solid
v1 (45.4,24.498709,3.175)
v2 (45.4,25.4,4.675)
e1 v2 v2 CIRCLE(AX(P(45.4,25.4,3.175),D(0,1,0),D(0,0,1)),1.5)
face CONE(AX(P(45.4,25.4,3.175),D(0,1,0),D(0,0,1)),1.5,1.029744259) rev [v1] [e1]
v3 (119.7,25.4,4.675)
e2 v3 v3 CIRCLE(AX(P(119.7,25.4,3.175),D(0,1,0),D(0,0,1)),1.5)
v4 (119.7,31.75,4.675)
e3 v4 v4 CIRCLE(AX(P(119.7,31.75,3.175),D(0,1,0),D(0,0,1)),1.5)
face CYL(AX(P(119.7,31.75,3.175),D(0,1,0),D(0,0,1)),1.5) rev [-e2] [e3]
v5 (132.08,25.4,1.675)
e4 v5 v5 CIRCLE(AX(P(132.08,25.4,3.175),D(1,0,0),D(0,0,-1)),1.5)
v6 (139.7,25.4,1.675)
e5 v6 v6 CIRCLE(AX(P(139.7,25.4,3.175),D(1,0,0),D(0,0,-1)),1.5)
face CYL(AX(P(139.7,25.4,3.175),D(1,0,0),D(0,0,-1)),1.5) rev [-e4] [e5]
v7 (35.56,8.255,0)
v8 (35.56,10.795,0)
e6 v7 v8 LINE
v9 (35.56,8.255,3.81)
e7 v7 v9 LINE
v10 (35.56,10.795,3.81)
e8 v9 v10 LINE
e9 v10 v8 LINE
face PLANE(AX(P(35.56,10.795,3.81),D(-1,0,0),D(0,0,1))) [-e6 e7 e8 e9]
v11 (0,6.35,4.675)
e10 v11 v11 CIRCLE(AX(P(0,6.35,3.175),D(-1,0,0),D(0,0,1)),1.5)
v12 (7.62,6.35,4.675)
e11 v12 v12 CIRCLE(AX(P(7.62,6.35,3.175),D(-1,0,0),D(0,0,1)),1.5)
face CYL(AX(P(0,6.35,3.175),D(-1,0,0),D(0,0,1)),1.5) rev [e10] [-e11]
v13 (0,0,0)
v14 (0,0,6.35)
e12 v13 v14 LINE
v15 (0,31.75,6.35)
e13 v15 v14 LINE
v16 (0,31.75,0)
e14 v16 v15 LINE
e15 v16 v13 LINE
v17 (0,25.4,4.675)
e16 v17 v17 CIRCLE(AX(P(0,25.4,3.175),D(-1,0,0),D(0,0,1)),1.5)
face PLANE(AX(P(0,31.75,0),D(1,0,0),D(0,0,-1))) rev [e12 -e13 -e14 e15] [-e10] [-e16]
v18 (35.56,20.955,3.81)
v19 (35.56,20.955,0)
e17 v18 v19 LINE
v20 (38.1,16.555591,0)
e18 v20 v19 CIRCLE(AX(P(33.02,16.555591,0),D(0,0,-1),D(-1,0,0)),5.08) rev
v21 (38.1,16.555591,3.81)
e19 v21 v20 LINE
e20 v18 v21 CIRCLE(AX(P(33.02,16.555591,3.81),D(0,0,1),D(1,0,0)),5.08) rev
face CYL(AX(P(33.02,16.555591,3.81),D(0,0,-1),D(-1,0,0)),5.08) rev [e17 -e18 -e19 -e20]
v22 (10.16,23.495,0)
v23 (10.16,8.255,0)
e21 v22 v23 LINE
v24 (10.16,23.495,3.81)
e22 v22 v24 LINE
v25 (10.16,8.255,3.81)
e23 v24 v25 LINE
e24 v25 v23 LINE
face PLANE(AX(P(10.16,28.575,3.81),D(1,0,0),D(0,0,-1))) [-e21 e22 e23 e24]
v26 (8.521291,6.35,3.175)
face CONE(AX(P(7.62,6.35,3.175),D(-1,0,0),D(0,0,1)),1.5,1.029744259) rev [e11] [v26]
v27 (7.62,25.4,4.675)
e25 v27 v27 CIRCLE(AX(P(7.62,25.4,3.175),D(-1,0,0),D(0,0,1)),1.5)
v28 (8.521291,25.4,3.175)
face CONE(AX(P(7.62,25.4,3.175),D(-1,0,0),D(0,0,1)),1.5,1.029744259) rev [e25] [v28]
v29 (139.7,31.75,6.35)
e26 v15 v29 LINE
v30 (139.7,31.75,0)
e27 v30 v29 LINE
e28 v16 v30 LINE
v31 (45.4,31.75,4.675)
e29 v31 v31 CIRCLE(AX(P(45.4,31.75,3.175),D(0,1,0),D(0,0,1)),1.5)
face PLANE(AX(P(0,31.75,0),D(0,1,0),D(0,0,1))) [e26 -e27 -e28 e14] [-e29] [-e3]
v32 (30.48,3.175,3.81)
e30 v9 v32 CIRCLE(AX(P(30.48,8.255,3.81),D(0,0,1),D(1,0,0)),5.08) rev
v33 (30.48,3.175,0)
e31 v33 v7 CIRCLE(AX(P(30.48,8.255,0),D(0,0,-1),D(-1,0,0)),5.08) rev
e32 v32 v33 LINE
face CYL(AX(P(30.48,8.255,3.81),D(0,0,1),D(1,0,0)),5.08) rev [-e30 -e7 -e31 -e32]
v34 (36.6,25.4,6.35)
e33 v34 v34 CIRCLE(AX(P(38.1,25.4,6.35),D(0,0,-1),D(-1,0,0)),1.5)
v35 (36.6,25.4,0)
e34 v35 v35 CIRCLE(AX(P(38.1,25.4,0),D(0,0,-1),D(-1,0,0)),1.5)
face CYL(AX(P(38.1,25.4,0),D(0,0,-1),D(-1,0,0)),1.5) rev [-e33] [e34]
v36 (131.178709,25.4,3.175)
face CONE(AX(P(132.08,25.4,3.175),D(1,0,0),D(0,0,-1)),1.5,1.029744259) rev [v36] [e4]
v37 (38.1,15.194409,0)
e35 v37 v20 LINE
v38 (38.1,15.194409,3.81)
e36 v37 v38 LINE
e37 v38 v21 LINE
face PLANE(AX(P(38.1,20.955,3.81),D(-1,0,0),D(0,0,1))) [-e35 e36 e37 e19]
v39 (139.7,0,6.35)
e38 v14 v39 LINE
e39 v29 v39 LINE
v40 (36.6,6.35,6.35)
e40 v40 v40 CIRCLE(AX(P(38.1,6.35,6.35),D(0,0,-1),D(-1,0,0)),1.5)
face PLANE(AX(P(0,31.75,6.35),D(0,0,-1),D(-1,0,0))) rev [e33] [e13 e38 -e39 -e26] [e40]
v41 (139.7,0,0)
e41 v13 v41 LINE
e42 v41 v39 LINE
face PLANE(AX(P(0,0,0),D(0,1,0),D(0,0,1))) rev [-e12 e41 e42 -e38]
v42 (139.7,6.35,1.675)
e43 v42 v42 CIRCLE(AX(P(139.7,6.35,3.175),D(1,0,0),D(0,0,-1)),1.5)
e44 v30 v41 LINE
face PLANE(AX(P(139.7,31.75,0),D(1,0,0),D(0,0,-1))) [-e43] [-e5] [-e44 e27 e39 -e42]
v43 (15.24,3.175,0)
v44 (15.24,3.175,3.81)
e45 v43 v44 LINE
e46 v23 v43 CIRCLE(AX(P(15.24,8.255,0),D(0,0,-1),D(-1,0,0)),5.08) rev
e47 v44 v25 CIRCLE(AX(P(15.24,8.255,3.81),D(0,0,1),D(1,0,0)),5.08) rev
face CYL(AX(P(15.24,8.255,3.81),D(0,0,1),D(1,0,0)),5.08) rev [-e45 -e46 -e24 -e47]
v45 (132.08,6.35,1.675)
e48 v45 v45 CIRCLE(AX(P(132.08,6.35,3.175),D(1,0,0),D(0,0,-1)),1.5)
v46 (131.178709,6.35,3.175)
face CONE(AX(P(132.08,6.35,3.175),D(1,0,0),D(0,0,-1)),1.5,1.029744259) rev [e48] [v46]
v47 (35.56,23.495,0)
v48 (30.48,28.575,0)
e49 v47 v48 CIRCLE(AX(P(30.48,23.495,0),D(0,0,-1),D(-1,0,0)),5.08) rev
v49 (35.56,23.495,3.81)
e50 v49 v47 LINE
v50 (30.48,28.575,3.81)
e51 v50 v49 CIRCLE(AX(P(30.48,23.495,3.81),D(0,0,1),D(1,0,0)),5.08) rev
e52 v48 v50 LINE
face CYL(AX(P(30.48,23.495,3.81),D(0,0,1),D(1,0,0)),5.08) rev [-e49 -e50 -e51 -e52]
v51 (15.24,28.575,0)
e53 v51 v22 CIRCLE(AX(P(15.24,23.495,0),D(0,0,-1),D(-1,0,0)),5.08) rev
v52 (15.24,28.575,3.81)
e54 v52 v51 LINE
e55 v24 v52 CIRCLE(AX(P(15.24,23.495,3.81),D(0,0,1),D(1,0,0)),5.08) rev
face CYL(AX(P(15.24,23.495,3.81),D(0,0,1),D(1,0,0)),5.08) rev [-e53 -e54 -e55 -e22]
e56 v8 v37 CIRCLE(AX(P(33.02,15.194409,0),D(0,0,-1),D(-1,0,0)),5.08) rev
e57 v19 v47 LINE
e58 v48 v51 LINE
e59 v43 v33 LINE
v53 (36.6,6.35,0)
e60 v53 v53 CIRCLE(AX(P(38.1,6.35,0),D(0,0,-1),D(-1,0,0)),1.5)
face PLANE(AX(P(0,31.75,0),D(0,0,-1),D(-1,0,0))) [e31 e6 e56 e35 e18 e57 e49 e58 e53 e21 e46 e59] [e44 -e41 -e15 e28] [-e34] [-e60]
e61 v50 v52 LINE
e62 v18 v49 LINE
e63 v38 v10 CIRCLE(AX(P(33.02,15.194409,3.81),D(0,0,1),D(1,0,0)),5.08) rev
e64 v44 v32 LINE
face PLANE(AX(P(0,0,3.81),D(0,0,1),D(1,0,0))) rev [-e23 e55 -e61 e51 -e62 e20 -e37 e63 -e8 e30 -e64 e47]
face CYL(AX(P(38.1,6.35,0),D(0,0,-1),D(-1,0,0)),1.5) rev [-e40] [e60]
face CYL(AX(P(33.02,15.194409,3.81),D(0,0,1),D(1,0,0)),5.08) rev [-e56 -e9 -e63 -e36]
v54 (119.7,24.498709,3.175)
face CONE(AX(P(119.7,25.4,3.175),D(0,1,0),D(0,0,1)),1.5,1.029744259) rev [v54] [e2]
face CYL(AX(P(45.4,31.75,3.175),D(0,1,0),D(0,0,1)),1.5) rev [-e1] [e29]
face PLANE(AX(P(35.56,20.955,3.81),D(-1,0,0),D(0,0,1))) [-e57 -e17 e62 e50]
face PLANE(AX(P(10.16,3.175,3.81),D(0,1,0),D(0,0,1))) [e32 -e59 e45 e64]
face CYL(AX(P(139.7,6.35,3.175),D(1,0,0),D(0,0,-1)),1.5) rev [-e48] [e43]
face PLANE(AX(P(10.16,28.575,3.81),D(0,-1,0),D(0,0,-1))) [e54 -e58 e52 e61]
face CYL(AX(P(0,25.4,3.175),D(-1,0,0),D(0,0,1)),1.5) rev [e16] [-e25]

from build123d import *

# Parameters (mm, degrees)
TOP_PROFILE_W                  = 139.7
TOP_PROFILE_H                  = 6.35
WALL_MID_DEPTH                 = 31.75
F_3_0MM_DOWEL_HOLE1_D          = 3
MOTOR_INTERFERECNE_DEPTH       = 3.81
FILLET2_R                      = 5.08
F_3_0MM_DOWEL_HOLE2_AT_2_COUNT = 2
F_3_0MM_DOWEL_HOLE2_AT_2_PITCH = 19.05
F_3_0MM_DOWEL_HOLE4_D          = 3
F_3_0MM_DOWEL_HOLE4_DEPTH      = 6.35
F_3_0MM_DOWEL_HOLE4_TIP        = 0.901290929


with BuildPart() as part:
    # top profile → wall mid (new body)
    with BuildSketch(Plane(origin=(0, 0, 0), x_dir=(1, 0, 0), z_dir=(0, 1, 0))):
        with Locations((69.85, -3.175)):
            Rectangle(TOP_PROFILE_W, TOP_PROFILE_H)
    extrude(amount=WALL_MID_DEPTH)

    # Ø3.0mm Dowel Hole1 (through all)
    with Locations(Plane(origin=(0, 0, 0), x_dir=(1, 0, 0), z_dir=(0, 0, -1))):
        with Locations((38.1, -6.35), (38.1, -25.4)):
            Hole(F_3_0MM_DOWEL_HOLE1_D / 2)

    # Sketch8 → motor interferecne (cut)
    with BuildSketch(Plane.XY):
        Polygon((10.16, 28.575), (35.56, 28.575), (35.56, 20.955), (38.1, 20.955), (38.1, 10.795), (35.56, 10.795), (35.56, 3.175), (10.16, 3.175), align=None)
    extrude(amount=MOTOR_INTERFERECNE_DEPTH, mode=Mode.SUBTRACT)

    # Fillet2
    # the kernel refuses this fillet: 5.08 mm, written as the material it adds along each edge
    with BuildSketch(Plane(origin=(10.16, 3.175, 0), x_dir=(1, 0, 0), z_dir=(0, 0, 1)), Plane(origin=(35.56, 3.175, 0), x_dir=(0, 1, 0), z_dir=(0, 0, 1)), Plane(origin=(35.56, 28.575, 0), x_dir=(-1, 0, 0), z_dir=(0, 0, 1))) as fillet2_piece_1:
        with BuildLine():
            CenterArc((FILLET2_R, FILLET2_R), FILLET2_R, 180, 90)
            Line((0, FILLET2_R), (-FILLET2_R * 0.02, FILLET2_R))
            Line((-FILLET2_R * 0.02, FILLET2_R), (-FILLET2_R * 0.02, -FILLET2_R * 0.02))
            Line((-FILLET2_R * 0.02, -FILLET2_R * 0.02), (FILLET2_R, -FILLET2_R * 0.02))
            Line((FILLET2_R, -FILLET2_R * 0.02), (FILLET2_R, 0))
        make_face()
    extrude(amount=3.81)
    with BuildSketch(Plane(origin=(10.16, 28.575, 0), x_dir=(1, 0, 0), z_dir=(0, 0, 1))) as fillet2_piece_2:
        with BuildLine():
            CenterArc((FILLET2_R, -FILLET2_R), FILLET2_R, 90, 90)
            Line((0, -FILLET2_R), (-FILLET2_R * 0.02, -FILLET2_R))
            Line((-FILLET2_R * 0.02, -FILLET2_R), (-FILLET2_R * 0.02, FILLET2_R * 0.02))
            Line((-FILLET2_R * 0.02, FILLET2_R * 0.02), (FILLET2_R, FILLET2_R * 0.02))
            Line((FILLET2_R, FILLET2_R * 0.02), (FILLET2_R, 0))
        make_face()
    extrude(amount=3.81)
    with BuildSketch(Plane(origin=(38.1, 10.795, 0), x_dir=(0, 1, 0), z_dir=(0, 0, 1))) as fillet2_piece_3:
        with BuildLine():
            CenterArc((4.399409051, 5.08), FILLET2_R, 210, 60)
            Line((0, 2.54), (-0.087988181, 2.4892))
            ThreePointArc((-0.087988181, 2.4892), (-0.1016, 1.27), (-0.1016, 0))
            Line((-0.1016, 0), (0, -0.1016))
            Line((0, -0.1016), (4.399409051, -0.1016))
            Line((4.399409051, -0.1016), (4.399409051, 0))
        make_face()
    extrude(amount=3.81)
    with BuildSketch(Plane(origin=(38.1, 20.955, 0), x_dir=(-1, 0, 0), z_dir=(0, 0, 1))) as fillet2_piece_4:
        with BuildLine():
            CenterArc((5.08, 4.399409051), FILLET2_R, 180, 60)
            Line((0, 4.399409051), (-0.1016, 4.399409051))
            Line((-0.1016, 4.399409051), (-0.1016, 0))
            Line((-0.1016, 0), (0, -0.1016))
            ThreePointArc((0, -0.1016), (1.27, -0.1016), (2.4892, -0.087988181))
            Line((2.4892, -0.087988181), (2.54, 0))
        make_face()
    extrude(amount=3.81)

    # Sketch13 → Ø3.0mm Dowel Hole2 (revolve, cut)
    with BuildSketch(Plane(origin=(0, 25.4, 3.175), x_dir=(0, 0, 1), z_dir=(0, 1, 0))):
        Polygon((0, 0), (0, 8.521290929), (1.5, 7.62), (1.5, 0), align=None)
    f_3_0mm_dowel_hole2 = revolve(axis=Axis((-6.35, 25.4, 3.175), (1, 0, 0)), mode=Mode.SUBTRACT)

    # Ø3.0mm Dowel Hole2 at 2: Ø3.0mm Dowel Hole2 ×2
    with Locations(*[(0, -i * F_3_0MM_DOWEL_HOLE2_AT_2_PITCH, 0) for i in range(1, F_3_0MM_DOWEL_HOLE2_AT_2_COUNT)]):
        add(f_3_0mm_dowel_hole2, mode=Mode.SUBTRACT)

    # Mirror1: Ø3.0mm Dowel Hole2 across plane
    add(f_3_0mm_dowel_hole2.mirror(Plane.ZY.offset(-69.85)), mode=Mode.SUBTRACT)

    # Mirror1 copy 1 sketch → Mirror1 copy 1 (revolve, cut)
    with BuildSketch(Plane(origin=(139.7, 6.35, 3.175), x_dir=(0, 0, 1), z_dir=(0, 1, 0))):
        Polygon((0, 0), (0, -8.521290929), (1.5, -7.62), (1.5, 0), align=None)
    revolve(axis=Axis((146.05, 6.35, 3.175), (1, 0, 0)), mode=Mode.SUBTRACT)

    # Ø3.0mm Dowel Hole4
    with Locations(Plane(origin=(146.05, 31.75, -25.4), x_dir=(-1, 0, 0), z_dir=(0, 1, 0))):
        with Locations((26.35, 28.575), (100.65, 28.575)):
            Hole(F_3_0MM_DOWEL_HOLE4_D / 2, depth=F_3_0MM_DOWEL_HOLE4_DEPTH)
            with Locations((0, 0, -(F_3_0MM_DOWEL_HOLE4_DEPTH + F_3_0MM_DOWEL_HOLE4_TIP / 2))):  # 118° drill point
                Cone(0, F_3_0MM_DOWEL_HOLE4_D / 2, F_3_0MM_DOWEL_HOLE4_TIP, mode=Mode.SUBTRACT)


solid = part.part
